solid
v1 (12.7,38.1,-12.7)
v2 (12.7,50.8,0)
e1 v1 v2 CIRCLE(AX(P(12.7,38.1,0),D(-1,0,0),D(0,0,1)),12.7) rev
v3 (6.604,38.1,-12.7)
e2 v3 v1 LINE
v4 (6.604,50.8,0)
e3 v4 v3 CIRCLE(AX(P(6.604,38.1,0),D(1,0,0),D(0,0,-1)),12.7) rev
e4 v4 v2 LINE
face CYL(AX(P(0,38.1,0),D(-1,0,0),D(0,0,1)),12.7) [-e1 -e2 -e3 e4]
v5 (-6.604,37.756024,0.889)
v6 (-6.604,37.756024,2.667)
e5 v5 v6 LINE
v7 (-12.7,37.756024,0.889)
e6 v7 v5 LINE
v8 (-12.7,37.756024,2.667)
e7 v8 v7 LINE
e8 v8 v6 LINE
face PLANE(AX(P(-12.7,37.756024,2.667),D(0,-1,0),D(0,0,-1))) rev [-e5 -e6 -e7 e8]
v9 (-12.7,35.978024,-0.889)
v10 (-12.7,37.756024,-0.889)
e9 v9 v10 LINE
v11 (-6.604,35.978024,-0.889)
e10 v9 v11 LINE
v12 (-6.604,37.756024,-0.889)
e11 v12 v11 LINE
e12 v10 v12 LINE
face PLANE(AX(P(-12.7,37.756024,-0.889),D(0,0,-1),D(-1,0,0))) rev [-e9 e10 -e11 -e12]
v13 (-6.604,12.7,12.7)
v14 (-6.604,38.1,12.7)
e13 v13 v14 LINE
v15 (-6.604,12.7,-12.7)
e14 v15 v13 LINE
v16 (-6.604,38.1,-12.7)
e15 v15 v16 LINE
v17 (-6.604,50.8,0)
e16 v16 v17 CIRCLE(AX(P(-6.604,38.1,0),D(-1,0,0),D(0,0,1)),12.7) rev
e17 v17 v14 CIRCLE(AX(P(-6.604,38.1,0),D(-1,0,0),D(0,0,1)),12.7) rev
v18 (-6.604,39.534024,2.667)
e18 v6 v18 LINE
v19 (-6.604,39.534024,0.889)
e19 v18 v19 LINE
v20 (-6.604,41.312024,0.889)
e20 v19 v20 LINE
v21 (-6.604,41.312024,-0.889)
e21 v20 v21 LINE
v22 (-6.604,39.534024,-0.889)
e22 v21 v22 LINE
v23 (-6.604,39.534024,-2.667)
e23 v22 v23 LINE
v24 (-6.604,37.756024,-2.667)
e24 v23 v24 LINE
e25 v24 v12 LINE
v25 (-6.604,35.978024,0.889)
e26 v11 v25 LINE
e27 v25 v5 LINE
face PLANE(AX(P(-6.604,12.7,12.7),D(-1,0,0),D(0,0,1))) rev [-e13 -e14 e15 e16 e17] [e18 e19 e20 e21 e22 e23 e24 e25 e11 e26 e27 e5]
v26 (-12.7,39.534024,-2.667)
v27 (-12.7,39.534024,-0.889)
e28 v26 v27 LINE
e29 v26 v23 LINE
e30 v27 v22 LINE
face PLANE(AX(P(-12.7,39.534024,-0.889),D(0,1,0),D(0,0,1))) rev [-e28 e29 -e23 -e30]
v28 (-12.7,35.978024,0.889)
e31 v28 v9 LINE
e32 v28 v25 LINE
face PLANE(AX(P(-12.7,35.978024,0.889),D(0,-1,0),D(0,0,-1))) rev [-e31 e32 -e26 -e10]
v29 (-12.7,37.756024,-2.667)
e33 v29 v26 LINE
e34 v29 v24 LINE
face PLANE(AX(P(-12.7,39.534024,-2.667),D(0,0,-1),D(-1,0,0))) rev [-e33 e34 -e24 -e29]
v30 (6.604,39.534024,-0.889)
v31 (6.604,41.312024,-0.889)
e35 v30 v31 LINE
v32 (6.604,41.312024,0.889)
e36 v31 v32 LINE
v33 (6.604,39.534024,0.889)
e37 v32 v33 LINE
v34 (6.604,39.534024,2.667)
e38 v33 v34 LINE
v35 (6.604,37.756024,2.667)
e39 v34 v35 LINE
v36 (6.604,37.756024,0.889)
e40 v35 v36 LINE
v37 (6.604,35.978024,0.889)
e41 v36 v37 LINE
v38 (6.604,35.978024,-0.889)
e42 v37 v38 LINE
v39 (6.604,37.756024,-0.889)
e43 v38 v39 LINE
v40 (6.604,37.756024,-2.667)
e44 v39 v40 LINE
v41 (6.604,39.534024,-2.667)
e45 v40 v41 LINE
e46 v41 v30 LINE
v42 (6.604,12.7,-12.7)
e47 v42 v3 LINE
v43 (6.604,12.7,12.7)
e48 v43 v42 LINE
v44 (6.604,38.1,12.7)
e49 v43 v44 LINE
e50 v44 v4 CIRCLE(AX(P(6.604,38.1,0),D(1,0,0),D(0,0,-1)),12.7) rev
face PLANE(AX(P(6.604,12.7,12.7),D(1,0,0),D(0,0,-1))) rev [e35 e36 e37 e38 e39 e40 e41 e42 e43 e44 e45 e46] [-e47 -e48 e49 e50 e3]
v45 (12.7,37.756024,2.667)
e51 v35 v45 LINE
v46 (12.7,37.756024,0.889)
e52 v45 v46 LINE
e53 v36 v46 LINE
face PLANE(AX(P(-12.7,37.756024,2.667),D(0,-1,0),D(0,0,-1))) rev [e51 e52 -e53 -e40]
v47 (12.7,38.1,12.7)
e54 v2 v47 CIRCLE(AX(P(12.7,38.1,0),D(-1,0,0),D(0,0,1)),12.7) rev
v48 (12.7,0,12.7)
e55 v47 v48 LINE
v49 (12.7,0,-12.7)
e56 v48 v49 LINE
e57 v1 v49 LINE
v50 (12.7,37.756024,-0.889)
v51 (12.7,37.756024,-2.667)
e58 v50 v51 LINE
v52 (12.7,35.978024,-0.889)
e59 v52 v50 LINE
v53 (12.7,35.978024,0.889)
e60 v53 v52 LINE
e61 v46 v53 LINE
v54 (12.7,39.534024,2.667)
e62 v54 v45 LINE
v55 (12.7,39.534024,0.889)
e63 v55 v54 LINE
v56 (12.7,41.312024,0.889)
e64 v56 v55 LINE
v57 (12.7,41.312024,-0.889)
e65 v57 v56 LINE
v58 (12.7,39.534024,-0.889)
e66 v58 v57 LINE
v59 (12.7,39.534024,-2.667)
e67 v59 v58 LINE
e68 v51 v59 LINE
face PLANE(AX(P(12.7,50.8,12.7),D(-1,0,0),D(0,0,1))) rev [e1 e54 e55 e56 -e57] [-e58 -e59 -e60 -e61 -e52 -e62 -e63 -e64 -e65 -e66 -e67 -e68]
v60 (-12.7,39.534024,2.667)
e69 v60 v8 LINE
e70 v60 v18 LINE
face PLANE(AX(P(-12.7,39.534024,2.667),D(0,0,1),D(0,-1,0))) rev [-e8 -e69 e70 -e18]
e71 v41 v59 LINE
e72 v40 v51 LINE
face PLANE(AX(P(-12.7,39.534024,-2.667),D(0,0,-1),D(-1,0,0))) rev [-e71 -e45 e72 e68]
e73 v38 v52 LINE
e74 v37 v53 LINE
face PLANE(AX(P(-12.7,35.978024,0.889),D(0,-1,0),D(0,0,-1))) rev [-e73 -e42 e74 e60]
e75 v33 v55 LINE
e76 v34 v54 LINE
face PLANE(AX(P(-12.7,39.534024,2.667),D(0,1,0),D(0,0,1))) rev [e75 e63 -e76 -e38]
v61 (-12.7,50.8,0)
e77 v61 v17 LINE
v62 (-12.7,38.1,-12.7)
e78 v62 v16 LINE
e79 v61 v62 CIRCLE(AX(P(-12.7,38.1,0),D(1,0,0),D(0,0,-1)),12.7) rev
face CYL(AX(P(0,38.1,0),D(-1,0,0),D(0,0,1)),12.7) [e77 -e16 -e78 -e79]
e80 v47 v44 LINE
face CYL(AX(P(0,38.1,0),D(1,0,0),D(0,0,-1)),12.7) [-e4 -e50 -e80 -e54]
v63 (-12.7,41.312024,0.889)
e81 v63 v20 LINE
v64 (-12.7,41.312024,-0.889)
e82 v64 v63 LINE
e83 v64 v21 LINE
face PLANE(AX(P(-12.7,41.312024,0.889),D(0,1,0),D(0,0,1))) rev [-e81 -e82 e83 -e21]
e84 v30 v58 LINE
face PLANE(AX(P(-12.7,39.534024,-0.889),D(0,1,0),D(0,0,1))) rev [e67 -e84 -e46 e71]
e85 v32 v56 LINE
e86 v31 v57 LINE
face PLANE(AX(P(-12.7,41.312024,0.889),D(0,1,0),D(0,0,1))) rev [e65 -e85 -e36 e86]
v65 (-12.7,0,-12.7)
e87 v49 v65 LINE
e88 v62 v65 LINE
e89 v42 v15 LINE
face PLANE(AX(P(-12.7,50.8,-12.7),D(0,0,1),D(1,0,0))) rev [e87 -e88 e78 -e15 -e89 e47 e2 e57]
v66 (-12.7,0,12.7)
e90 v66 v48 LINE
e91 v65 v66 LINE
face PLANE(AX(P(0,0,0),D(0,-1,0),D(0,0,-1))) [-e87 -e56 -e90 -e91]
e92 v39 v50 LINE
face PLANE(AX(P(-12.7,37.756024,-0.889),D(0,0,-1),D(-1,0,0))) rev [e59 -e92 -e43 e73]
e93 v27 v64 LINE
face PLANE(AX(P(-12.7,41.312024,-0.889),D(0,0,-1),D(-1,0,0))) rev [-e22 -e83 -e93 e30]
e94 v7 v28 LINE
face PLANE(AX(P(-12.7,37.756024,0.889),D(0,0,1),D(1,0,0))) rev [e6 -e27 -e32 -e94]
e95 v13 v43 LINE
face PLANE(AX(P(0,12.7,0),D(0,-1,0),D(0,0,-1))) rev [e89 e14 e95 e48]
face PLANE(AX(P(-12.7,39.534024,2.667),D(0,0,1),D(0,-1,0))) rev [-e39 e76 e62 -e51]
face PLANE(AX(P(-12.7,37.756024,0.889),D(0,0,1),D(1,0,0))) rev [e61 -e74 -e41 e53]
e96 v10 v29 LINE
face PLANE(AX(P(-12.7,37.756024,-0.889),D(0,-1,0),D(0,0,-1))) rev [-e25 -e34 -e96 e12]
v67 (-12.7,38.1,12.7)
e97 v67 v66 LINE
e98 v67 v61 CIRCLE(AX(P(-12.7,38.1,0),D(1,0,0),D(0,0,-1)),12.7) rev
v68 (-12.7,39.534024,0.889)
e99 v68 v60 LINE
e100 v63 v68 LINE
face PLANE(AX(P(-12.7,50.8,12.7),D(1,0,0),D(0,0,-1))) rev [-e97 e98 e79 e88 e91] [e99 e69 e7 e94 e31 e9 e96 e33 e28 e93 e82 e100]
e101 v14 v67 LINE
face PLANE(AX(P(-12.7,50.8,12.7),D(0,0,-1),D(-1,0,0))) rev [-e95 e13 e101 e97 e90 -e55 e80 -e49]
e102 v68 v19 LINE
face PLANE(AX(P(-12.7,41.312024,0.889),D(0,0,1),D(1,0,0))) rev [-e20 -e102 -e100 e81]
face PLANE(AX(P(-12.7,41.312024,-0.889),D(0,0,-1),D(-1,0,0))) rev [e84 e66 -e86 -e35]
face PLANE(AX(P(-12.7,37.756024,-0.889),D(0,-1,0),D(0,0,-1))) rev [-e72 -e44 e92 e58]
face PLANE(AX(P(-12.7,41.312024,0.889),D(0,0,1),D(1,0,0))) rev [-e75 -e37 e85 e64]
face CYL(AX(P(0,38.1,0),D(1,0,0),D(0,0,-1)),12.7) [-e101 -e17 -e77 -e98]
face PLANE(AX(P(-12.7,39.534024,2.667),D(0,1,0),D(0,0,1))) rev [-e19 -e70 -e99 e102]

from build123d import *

# Parameters (mm, degrees)
SKETCH1_W           = 25.4
SKETCH1_H           = 25.4
BOSS_EXTRUDE1_DEPTH = 50.8
SKETCH2_W           = 13.208
SKETCH2_H           = 25.4
CUT_EXTRUDE1_DEPTH  = 38.1
CUT_EXTRUDE2_DEPTH  = 59.198711326
FILLET1_R           = 12.7


with BuildPart() as part:
    # Sketch1 → Boss-Extrude1 (new body)
    with BuildSketch(Plane(origin=(0, 0, 0), x_dir=(1, 0, 0), z_dir=(0, 1, 0))):
        Rectangle(SKETCH1_W, SKETCH1_H)
    extrude(amount=BOSS_EXTRUDE1_DEPTH)

    # Sketch2 → Cut-Extrude1 (cut)
    with BuildSketch(Plane(origin=(0, 50.8, 0), x_dir=(1, 0, 0), z_dir=(0, 1, 0))):
        Rectangle(SKETCH2_W, SKETCH2_H)
    extrude(amount=-CUT_EXTRUDE1_DEPTH, mode=Mode.SUBTRACT)

    # Sketch3 → Cut-Extrude2 (cut, through all)
    with BuildSketch(Plane(origin=(12.7, 0, 0), x_dir=(0, 0, -1), z_dir=(1, 0, 0))):
        Polygon((-0.889, 41.312023576), (0.889, 41.312023576), (0.889, 39.534023576), (2.667, 39.534023576), (2.667, 37.756023576), (0.889, 37.756023576), (0.889, 35.978023576), (-0.889, 35.978023576), (-0.889, 37.756023576), (-2.667, 37.756023576), (-2.667, 39.534023576), (-0.889, 39.534023576), align=None)
    extrude(amount=-CUT_EXTRUDE2_DEPTH, mode=Mode.SUBTRACT)

    # Fillet1
    fillet1_edges = [part.edges().sort_by_distance(p)[0] for p in [
        (9.652, 50.8, -12.7),
        (-9.652, 50.8, -12.7),
        (-9.652, 50.8, 12.7),
        (9.652, 50.8, 12.7),
    ]]
    fillet(fillet1_edges, radius=FILLET1_R - 0.0001)  # a hair under: the kernel refuses the full size


solid = part.part
